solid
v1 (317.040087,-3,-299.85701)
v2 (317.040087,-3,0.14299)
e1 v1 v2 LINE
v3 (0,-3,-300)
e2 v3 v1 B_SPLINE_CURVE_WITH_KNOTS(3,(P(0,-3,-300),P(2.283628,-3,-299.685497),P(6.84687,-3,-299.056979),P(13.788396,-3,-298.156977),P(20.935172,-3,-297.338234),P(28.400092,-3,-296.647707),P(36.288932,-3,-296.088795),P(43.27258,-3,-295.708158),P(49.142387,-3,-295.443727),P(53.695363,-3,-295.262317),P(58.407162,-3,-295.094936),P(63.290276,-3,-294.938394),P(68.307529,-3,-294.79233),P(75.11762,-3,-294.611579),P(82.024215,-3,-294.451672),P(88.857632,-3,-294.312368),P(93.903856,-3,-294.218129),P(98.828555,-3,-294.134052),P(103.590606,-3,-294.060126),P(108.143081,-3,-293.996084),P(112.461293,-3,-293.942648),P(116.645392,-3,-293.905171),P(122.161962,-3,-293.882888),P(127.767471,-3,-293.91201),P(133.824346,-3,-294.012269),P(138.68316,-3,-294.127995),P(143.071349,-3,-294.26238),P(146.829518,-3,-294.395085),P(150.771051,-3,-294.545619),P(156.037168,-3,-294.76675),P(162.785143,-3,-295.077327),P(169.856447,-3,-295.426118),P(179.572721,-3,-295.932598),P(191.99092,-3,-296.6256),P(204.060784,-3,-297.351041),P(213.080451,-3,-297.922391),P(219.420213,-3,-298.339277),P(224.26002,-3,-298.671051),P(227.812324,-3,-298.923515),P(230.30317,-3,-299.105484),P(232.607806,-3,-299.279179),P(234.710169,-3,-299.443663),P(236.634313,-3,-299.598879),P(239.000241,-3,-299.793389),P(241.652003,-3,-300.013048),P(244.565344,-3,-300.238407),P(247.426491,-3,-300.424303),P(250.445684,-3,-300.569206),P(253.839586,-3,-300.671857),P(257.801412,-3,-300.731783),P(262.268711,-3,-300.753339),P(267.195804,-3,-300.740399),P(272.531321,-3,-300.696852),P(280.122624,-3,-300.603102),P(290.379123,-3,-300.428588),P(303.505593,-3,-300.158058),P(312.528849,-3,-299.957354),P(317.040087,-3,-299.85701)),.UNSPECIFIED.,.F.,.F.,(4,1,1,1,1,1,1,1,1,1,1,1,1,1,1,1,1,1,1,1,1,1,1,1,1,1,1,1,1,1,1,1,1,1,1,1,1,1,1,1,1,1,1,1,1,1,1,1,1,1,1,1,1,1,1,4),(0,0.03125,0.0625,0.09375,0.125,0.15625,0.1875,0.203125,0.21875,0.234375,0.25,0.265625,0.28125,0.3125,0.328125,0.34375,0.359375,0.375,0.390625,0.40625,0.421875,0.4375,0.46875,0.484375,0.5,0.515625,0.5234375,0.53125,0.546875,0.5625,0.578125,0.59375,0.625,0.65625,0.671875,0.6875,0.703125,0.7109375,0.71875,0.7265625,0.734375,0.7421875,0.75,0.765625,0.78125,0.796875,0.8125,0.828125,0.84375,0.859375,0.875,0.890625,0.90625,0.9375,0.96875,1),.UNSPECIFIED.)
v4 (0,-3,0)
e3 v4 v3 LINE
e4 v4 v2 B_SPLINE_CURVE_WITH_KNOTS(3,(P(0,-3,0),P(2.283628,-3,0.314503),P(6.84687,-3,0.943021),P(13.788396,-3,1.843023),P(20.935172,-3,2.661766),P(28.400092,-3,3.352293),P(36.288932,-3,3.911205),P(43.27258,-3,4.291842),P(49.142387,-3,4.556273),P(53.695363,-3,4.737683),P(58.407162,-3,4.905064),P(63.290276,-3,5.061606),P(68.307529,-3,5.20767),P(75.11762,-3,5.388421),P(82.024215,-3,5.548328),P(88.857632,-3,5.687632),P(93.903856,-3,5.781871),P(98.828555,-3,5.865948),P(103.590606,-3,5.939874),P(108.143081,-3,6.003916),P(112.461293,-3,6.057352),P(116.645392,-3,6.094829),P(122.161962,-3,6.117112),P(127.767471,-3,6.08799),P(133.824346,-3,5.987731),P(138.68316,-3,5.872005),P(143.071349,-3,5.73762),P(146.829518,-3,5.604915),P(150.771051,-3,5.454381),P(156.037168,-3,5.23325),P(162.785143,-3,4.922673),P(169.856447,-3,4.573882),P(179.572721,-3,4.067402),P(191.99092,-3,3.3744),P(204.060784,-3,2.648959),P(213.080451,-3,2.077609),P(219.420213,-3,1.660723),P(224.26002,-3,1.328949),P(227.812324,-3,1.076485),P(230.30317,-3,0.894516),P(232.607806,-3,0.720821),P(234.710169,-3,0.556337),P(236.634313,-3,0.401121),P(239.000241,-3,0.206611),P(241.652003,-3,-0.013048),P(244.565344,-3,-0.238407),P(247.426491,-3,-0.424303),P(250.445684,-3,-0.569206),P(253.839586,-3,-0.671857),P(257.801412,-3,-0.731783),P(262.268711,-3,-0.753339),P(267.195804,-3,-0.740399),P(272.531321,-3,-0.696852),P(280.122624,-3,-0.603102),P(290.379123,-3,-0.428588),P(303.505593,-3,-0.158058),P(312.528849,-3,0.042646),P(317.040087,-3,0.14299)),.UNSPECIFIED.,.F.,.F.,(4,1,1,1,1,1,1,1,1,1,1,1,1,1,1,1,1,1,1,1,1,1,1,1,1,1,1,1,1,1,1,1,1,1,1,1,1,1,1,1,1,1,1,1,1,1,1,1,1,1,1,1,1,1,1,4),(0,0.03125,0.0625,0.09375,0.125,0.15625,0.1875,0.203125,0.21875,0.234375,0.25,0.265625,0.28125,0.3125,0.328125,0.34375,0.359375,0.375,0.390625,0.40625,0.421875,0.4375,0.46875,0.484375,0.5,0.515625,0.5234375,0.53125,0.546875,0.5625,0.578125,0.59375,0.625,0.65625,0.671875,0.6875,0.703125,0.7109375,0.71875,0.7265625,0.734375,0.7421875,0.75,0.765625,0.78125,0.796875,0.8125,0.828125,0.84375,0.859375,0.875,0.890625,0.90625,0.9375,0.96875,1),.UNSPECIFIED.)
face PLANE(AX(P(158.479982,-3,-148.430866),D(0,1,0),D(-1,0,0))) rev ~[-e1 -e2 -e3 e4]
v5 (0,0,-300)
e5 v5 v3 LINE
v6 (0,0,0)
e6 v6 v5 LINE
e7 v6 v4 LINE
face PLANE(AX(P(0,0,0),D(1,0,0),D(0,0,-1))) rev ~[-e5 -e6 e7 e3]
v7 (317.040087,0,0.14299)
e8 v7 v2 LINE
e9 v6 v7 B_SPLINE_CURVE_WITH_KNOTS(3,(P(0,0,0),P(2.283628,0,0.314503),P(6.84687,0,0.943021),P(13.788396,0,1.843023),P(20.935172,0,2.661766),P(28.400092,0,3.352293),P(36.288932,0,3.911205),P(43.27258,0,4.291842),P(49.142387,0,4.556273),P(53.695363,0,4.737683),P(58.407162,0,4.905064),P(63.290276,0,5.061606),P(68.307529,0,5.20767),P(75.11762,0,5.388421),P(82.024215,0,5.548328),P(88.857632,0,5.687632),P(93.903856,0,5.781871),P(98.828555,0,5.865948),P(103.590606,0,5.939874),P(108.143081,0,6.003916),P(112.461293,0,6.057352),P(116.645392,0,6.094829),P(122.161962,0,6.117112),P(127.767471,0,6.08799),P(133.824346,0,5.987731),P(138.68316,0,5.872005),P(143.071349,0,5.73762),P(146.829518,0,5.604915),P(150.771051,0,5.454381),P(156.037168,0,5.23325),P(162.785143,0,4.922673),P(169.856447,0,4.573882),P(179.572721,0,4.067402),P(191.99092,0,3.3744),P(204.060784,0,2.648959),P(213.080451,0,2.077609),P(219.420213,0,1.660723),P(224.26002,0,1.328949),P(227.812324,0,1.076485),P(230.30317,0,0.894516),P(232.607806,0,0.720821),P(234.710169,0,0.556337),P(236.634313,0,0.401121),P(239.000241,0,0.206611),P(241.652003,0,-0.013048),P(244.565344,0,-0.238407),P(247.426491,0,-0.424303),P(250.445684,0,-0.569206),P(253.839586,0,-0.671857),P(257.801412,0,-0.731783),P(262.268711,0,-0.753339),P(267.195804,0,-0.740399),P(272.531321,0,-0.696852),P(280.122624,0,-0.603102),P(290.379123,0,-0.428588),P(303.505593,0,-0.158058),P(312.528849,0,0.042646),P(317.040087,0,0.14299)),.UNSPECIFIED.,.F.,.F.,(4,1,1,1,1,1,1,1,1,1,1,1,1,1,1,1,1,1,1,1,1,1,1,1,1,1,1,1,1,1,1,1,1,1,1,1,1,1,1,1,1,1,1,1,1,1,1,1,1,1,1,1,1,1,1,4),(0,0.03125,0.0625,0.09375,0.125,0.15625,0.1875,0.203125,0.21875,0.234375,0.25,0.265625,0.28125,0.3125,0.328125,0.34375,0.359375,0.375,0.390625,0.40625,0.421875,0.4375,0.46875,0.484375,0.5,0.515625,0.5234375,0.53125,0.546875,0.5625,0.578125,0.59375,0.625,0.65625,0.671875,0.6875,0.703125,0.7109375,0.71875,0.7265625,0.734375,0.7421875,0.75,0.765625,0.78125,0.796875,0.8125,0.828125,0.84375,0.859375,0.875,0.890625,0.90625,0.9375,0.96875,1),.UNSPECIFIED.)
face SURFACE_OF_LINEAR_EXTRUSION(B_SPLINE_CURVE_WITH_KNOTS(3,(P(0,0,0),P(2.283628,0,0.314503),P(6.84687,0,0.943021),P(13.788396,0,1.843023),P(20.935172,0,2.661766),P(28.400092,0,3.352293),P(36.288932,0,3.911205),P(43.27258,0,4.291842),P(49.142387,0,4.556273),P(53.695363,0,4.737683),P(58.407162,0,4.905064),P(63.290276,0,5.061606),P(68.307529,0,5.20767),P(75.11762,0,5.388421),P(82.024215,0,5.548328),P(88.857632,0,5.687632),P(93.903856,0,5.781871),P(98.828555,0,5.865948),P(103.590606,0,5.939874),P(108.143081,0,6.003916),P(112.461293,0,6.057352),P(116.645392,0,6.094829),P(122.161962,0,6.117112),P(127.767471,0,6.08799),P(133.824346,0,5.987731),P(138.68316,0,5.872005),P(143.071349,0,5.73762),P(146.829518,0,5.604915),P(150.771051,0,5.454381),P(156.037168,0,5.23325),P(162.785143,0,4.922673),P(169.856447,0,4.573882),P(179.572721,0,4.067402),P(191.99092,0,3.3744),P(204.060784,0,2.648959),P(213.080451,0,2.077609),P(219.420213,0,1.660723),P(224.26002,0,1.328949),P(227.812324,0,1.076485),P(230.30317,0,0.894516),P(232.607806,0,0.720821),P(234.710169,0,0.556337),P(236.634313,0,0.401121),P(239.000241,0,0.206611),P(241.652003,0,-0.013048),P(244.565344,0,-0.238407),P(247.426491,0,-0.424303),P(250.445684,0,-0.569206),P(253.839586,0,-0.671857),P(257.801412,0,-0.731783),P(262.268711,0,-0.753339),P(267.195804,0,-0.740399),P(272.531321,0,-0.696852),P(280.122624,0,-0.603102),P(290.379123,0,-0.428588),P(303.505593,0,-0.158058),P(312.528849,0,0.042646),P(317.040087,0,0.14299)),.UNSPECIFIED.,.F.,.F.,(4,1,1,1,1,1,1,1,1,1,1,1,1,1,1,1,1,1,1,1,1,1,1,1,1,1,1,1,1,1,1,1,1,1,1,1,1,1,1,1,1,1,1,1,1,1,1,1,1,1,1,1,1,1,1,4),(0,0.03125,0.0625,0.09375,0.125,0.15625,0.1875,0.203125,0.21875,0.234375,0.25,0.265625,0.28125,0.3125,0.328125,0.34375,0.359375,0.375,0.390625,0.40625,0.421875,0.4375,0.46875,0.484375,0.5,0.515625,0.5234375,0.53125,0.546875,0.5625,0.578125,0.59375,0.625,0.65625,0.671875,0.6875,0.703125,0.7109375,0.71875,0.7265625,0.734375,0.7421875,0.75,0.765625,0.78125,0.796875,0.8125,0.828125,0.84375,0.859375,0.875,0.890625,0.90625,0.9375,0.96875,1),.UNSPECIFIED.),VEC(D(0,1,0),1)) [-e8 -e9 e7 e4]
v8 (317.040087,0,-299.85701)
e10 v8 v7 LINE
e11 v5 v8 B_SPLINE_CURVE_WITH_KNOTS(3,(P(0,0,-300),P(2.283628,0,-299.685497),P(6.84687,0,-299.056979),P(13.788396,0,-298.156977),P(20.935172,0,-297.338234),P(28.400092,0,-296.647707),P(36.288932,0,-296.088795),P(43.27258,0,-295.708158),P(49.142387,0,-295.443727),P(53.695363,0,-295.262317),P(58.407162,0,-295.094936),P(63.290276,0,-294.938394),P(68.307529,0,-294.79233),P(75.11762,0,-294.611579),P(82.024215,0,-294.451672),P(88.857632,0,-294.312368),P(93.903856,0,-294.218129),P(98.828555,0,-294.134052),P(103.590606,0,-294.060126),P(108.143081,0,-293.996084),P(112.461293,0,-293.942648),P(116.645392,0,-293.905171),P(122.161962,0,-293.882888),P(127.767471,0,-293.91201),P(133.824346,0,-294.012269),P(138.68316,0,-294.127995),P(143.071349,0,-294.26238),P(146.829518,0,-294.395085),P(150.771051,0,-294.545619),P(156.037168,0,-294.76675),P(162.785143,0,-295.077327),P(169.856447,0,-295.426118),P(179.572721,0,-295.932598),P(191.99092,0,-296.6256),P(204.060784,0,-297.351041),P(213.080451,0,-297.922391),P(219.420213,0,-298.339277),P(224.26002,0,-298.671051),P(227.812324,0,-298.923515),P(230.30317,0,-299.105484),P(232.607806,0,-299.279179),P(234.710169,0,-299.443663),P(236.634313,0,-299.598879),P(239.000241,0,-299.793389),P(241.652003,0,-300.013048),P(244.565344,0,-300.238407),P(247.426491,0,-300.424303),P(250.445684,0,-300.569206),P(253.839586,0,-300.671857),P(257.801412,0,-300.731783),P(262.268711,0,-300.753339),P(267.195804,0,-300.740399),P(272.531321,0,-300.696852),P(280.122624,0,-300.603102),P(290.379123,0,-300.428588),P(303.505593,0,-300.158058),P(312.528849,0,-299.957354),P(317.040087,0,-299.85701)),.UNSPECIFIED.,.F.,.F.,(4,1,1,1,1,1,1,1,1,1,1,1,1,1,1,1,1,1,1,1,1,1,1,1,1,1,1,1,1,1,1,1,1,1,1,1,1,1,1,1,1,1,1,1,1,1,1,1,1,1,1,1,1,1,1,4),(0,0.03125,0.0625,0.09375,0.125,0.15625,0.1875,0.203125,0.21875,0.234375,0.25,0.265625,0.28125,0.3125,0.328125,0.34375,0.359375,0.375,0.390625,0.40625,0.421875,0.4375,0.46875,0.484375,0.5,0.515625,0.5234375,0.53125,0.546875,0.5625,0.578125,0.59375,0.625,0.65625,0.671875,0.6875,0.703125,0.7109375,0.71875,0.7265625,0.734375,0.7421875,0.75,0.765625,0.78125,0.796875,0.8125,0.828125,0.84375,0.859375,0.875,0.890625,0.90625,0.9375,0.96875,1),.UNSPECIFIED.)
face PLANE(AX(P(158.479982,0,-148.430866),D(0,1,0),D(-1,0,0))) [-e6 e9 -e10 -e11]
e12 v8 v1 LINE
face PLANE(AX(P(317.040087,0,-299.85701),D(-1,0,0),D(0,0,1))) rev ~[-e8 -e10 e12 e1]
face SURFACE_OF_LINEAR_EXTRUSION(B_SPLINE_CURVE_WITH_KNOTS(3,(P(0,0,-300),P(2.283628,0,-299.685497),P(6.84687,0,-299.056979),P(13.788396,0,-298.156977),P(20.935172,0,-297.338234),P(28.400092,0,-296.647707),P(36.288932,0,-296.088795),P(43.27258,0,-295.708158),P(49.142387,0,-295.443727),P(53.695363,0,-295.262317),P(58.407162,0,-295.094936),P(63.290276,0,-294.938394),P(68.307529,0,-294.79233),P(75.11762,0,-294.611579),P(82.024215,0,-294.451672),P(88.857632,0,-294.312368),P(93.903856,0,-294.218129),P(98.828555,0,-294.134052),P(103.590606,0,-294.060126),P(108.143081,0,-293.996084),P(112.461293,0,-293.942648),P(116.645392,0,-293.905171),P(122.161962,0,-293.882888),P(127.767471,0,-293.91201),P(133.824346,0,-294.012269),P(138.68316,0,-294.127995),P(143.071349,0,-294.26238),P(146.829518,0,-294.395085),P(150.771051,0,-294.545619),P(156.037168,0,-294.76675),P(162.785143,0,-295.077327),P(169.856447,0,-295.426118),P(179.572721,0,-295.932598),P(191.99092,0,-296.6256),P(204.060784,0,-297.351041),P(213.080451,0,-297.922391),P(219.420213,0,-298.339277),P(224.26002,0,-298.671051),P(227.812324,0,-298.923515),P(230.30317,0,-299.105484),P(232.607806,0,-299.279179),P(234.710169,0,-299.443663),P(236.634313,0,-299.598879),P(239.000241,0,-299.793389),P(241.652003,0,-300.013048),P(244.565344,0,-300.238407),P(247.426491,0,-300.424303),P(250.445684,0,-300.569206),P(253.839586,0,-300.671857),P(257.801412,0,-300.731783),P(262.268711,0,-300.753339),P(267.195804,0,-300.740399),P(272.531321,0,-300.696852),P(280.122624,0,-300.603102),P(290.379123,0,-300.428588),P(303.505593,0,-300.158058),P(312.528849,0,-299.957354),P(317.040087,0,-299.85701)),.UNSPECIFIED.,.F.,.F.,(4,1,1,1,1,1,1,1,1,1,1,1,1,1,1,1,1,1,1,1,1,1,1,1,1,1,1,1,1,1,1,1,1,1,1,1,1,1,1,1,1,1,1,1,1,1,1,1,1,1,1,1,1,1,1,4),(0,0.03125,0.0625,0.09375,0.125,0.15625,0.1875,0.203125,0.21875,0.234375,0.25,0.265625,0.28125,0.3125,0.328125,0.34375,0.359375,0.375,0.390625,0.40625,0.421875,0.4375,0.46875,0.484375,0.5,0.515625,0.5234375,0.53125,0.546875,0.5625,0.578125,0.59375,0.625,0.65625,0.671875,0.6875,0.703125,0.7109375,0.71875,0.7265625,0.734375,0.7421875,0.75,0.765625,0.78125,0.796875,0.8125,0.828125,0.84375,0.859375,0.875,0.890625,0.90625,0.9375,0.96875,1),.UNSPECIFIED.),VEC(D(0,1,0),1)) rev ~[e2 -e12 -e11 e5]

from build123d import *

# Parameters (mm, degrees)
F1_DEPTH = 3


# Not quite as in the source:
# - the dataset's text gives a spline's control points without its knots; the knots are read off the source's solid


with BuildPart() as f1:
    # F0 (on Front) → F1 (new body)
    with BuildSketch(Plane.XZ):
        with BuildLine():
            add(Edge.make_bspline(
                [(0, 0), (2.2836279369, 0.3145032409), (6.8468695701, 0.9430212827), (13.7883957694, 1.843023423), (20.9351718591, 2.6617660327), (28.4000924164, 3.352293114), (36.2889316073, 3.9112052115), (43.2725801473, 4.2918421707), (49.1423870677, 4.5562734212), (53.6953625842, 4.7376825434), (58.4071616109, 4.9050635606), (63.2902761656, 5.0616060673), (68.3075293089, 5.2076702034), (75.1176202129, 5.3884210069), (82.024215434, 5.5483277484), (88.8576319072, 5.6876320865), (93.9038556027, 5.7818708045), (98.8285547302, 5.8659479641), (103.5906057144, 5.9398743656), (108.1430811393, 6.0039156213), (112.4612934577, 6.0573519358), (116.6453916848, 6.0948291734), (122.1619616105, 6.1171117414), (127.7674711212, 6.0879897124), (133.8243459683, 5.987730754), (138.6831596477, 5.8720051249), (143.0713489502, 5.7376203302), (146.8295178196, 5.604915141), (150.7710511797, 5.4543814812), (156.0371681528, 5.2332504261), (162.7851432075, 4.9226726022), (169.8564474069, 4.5738817065), (179.5727208922, 4.0674021471), (191.9909197151, 3.3743996448), (204.0607844537, 2.6489586812), (213.0804507845, 2.0776092898), (219.4202128983, 1.660722706), (224.2600201136, 1.3289486164), (227.812323813, 1.0764850666), (230.3031695378, 0.8945155465), (232.6078059914, 0.7208213242), (234.7101690311, 0.5563368187), (236.6343126707, 0.4011209176), (239.0002413484, 0.2066110814), (241.6520027599, -0.0130478298), (244.565343726, -0.2384073924), (247.4264911207, -0.424302615), (250.4456840711, -0.5692062647), (253.8395863669, -0.6718571), (257.8014120165, -0.7317828333), (262.2687110809, -0.7533390738), (267.1958040678, -0.7403987813), (272.5313211273, -0.6968519806), (280.122623956, -0.6031018214), (290.3791232139, -0.4285877374), (303.5055932591, -0.1580584898), (312.528848624, 0.0426461204), (317.0400871915, 0.1429895898)],
                knots=[0, 0, 0, 0, 0.03125, 0.0625, 0.09375, 0.125, 0.15625, 0.1875, 0.203125, 0.21875, 0.234375, 0.25, 0.265625, 0.28125, 0.3125, 0.328125, 0.34375, 0.359375, 0.375, 0.390625, 0.40625, 0.421875, 0.4375, 0.46875, 0.484375, 0.5, 0.515625, 0.5234375, 0.53125, 0.546875, 0.5625, 0.578125, 0.59375, 0.625, 0.65625, 0.671875, 0.6875, 0.703125, 0.7109375, 0.71875, 0.7265625, 0.734375, 0.7421875, 0.75, 0.765625, 0.78125, 0.796875, 0.8125, 0.828125, 0.84375, 0.859375, 0.875, 0.890625, 0.90625, 0.9375, 0.96875, 1, 1, 1, 1], degree=3))
            Line((0, 0), (0, -300))
            add(Edge.make_bspline(
                [(0, -300), (2.2836279369, -299.6854967591), (6.8468695701, -299.0569787173), (13.7883957694, -298.156976577), (20.9351718591, -297.3382339673), (28.4000924164, -296.647706886), (36.2889316073, -296.0887947885), (43.2725801473, -295.7081578293), (49.1423870677, -295.4437265788), (53.6953625842, -295.2623174566), (58.4071616109, -295.0949364394), (63.2902761656, -294.9383939327), (68.3075293089, -294.7923297966), (75.1176202129, -294.6115789931), (82.024215434, -294.4516722516), (88.8576319072, -294.3123679135), (93.9038556027, -294.2181291955), (98.8285547302, -294.1340520359), (103.5906057144, -294.0601256344), (108.1430811393, -293.9960843787), (112.4612934577, -293.9426480642), (116.6453916848, -293.9051708266), (122.1619616105, -293.8828882586), (127.7674711212, -293.9120102876), (133.8243459683, -294.012269246), (138.6831596477, -294.1279948751), (143.0713489502, -294.2623796698), (146.8295178196, -294.395084859), (150.7710511797, -294.5456185188), (156.0371681528, -294.7667495739), (162.7851432075, -295.0773273978), (169.8564474069, -295.4261182935), (179.5727208922, -295.9325978529), (191.9909197151, -296.6256003552), (204.0607844537, -297.3510413188), (213.0804507845, -297.9223907102), (219.4202128983, -298.339277294), (224.2600201136, -298.6710513836), (227.812323813, -298.9235149334), (230.3031695378, -299.1054844535), (232.6078059914, -299.2791786758), (234.7101690311, -299.4436631813), (236.6343126707, -299.5988790824), (239.0002413484, -299.7933889186), (241.6520027599, -300.0130478298), (244.565343726, -300.2384073924), (247.4264911207, -300.424302615), (250.4456840711, -300.5692062647), (253.8395863669, -300.6718571), (257.8014120165, -300.7317828333), (262.2687110809, -300.7533390738), (267.1958040678, -300.7403987813), (272.5313211273, -300.6968519806), (280.122623956, -300.6031018214), (290.3791232139, -300.4285877374), (303.5055932591, -300.1580584898), (312.528848624, -299.9573538796), (317.0400871915, -299.8570104102)],
                knots=[0, 0, 0, 0, 0.03125, 0.0625, 0.09375, 0.125, 0.15625, 0.1875, 0.203125, 0.21875, 0.234375, 0.25, 0.265625, 0.28125, 0.3125, 0.328125, 0.34375, 0.359375, 0.375, 0.390625, 0.40625, 0.421875, 0.4375, 0.46875, 0.484375, 0.5, 0.515625, 0.5234375, 0.53125, 0.546875, 0.5625, 0.578125, 0.59375, 0.625, 0.65625, 0.671875, 0.6875, 0.703125, 0.7109375, 0.71875, 0.7265625, 0.734375, 0.7421875, 0.75, 0.765625, 0.78125, 0.796875, 0.8125, 0.828125, 0.84375, 0.859375, 0.875, 0.890625, 0.90625, 0.9375, 0.96875, 1, 1, 1, 1], degree=3))
            Line((317.0400871915, -299.8570104102), (317.0400871915, 0.1429895898))
        make_face()
    extrude(amount=F1_DEPTH)


solid = f1.part
